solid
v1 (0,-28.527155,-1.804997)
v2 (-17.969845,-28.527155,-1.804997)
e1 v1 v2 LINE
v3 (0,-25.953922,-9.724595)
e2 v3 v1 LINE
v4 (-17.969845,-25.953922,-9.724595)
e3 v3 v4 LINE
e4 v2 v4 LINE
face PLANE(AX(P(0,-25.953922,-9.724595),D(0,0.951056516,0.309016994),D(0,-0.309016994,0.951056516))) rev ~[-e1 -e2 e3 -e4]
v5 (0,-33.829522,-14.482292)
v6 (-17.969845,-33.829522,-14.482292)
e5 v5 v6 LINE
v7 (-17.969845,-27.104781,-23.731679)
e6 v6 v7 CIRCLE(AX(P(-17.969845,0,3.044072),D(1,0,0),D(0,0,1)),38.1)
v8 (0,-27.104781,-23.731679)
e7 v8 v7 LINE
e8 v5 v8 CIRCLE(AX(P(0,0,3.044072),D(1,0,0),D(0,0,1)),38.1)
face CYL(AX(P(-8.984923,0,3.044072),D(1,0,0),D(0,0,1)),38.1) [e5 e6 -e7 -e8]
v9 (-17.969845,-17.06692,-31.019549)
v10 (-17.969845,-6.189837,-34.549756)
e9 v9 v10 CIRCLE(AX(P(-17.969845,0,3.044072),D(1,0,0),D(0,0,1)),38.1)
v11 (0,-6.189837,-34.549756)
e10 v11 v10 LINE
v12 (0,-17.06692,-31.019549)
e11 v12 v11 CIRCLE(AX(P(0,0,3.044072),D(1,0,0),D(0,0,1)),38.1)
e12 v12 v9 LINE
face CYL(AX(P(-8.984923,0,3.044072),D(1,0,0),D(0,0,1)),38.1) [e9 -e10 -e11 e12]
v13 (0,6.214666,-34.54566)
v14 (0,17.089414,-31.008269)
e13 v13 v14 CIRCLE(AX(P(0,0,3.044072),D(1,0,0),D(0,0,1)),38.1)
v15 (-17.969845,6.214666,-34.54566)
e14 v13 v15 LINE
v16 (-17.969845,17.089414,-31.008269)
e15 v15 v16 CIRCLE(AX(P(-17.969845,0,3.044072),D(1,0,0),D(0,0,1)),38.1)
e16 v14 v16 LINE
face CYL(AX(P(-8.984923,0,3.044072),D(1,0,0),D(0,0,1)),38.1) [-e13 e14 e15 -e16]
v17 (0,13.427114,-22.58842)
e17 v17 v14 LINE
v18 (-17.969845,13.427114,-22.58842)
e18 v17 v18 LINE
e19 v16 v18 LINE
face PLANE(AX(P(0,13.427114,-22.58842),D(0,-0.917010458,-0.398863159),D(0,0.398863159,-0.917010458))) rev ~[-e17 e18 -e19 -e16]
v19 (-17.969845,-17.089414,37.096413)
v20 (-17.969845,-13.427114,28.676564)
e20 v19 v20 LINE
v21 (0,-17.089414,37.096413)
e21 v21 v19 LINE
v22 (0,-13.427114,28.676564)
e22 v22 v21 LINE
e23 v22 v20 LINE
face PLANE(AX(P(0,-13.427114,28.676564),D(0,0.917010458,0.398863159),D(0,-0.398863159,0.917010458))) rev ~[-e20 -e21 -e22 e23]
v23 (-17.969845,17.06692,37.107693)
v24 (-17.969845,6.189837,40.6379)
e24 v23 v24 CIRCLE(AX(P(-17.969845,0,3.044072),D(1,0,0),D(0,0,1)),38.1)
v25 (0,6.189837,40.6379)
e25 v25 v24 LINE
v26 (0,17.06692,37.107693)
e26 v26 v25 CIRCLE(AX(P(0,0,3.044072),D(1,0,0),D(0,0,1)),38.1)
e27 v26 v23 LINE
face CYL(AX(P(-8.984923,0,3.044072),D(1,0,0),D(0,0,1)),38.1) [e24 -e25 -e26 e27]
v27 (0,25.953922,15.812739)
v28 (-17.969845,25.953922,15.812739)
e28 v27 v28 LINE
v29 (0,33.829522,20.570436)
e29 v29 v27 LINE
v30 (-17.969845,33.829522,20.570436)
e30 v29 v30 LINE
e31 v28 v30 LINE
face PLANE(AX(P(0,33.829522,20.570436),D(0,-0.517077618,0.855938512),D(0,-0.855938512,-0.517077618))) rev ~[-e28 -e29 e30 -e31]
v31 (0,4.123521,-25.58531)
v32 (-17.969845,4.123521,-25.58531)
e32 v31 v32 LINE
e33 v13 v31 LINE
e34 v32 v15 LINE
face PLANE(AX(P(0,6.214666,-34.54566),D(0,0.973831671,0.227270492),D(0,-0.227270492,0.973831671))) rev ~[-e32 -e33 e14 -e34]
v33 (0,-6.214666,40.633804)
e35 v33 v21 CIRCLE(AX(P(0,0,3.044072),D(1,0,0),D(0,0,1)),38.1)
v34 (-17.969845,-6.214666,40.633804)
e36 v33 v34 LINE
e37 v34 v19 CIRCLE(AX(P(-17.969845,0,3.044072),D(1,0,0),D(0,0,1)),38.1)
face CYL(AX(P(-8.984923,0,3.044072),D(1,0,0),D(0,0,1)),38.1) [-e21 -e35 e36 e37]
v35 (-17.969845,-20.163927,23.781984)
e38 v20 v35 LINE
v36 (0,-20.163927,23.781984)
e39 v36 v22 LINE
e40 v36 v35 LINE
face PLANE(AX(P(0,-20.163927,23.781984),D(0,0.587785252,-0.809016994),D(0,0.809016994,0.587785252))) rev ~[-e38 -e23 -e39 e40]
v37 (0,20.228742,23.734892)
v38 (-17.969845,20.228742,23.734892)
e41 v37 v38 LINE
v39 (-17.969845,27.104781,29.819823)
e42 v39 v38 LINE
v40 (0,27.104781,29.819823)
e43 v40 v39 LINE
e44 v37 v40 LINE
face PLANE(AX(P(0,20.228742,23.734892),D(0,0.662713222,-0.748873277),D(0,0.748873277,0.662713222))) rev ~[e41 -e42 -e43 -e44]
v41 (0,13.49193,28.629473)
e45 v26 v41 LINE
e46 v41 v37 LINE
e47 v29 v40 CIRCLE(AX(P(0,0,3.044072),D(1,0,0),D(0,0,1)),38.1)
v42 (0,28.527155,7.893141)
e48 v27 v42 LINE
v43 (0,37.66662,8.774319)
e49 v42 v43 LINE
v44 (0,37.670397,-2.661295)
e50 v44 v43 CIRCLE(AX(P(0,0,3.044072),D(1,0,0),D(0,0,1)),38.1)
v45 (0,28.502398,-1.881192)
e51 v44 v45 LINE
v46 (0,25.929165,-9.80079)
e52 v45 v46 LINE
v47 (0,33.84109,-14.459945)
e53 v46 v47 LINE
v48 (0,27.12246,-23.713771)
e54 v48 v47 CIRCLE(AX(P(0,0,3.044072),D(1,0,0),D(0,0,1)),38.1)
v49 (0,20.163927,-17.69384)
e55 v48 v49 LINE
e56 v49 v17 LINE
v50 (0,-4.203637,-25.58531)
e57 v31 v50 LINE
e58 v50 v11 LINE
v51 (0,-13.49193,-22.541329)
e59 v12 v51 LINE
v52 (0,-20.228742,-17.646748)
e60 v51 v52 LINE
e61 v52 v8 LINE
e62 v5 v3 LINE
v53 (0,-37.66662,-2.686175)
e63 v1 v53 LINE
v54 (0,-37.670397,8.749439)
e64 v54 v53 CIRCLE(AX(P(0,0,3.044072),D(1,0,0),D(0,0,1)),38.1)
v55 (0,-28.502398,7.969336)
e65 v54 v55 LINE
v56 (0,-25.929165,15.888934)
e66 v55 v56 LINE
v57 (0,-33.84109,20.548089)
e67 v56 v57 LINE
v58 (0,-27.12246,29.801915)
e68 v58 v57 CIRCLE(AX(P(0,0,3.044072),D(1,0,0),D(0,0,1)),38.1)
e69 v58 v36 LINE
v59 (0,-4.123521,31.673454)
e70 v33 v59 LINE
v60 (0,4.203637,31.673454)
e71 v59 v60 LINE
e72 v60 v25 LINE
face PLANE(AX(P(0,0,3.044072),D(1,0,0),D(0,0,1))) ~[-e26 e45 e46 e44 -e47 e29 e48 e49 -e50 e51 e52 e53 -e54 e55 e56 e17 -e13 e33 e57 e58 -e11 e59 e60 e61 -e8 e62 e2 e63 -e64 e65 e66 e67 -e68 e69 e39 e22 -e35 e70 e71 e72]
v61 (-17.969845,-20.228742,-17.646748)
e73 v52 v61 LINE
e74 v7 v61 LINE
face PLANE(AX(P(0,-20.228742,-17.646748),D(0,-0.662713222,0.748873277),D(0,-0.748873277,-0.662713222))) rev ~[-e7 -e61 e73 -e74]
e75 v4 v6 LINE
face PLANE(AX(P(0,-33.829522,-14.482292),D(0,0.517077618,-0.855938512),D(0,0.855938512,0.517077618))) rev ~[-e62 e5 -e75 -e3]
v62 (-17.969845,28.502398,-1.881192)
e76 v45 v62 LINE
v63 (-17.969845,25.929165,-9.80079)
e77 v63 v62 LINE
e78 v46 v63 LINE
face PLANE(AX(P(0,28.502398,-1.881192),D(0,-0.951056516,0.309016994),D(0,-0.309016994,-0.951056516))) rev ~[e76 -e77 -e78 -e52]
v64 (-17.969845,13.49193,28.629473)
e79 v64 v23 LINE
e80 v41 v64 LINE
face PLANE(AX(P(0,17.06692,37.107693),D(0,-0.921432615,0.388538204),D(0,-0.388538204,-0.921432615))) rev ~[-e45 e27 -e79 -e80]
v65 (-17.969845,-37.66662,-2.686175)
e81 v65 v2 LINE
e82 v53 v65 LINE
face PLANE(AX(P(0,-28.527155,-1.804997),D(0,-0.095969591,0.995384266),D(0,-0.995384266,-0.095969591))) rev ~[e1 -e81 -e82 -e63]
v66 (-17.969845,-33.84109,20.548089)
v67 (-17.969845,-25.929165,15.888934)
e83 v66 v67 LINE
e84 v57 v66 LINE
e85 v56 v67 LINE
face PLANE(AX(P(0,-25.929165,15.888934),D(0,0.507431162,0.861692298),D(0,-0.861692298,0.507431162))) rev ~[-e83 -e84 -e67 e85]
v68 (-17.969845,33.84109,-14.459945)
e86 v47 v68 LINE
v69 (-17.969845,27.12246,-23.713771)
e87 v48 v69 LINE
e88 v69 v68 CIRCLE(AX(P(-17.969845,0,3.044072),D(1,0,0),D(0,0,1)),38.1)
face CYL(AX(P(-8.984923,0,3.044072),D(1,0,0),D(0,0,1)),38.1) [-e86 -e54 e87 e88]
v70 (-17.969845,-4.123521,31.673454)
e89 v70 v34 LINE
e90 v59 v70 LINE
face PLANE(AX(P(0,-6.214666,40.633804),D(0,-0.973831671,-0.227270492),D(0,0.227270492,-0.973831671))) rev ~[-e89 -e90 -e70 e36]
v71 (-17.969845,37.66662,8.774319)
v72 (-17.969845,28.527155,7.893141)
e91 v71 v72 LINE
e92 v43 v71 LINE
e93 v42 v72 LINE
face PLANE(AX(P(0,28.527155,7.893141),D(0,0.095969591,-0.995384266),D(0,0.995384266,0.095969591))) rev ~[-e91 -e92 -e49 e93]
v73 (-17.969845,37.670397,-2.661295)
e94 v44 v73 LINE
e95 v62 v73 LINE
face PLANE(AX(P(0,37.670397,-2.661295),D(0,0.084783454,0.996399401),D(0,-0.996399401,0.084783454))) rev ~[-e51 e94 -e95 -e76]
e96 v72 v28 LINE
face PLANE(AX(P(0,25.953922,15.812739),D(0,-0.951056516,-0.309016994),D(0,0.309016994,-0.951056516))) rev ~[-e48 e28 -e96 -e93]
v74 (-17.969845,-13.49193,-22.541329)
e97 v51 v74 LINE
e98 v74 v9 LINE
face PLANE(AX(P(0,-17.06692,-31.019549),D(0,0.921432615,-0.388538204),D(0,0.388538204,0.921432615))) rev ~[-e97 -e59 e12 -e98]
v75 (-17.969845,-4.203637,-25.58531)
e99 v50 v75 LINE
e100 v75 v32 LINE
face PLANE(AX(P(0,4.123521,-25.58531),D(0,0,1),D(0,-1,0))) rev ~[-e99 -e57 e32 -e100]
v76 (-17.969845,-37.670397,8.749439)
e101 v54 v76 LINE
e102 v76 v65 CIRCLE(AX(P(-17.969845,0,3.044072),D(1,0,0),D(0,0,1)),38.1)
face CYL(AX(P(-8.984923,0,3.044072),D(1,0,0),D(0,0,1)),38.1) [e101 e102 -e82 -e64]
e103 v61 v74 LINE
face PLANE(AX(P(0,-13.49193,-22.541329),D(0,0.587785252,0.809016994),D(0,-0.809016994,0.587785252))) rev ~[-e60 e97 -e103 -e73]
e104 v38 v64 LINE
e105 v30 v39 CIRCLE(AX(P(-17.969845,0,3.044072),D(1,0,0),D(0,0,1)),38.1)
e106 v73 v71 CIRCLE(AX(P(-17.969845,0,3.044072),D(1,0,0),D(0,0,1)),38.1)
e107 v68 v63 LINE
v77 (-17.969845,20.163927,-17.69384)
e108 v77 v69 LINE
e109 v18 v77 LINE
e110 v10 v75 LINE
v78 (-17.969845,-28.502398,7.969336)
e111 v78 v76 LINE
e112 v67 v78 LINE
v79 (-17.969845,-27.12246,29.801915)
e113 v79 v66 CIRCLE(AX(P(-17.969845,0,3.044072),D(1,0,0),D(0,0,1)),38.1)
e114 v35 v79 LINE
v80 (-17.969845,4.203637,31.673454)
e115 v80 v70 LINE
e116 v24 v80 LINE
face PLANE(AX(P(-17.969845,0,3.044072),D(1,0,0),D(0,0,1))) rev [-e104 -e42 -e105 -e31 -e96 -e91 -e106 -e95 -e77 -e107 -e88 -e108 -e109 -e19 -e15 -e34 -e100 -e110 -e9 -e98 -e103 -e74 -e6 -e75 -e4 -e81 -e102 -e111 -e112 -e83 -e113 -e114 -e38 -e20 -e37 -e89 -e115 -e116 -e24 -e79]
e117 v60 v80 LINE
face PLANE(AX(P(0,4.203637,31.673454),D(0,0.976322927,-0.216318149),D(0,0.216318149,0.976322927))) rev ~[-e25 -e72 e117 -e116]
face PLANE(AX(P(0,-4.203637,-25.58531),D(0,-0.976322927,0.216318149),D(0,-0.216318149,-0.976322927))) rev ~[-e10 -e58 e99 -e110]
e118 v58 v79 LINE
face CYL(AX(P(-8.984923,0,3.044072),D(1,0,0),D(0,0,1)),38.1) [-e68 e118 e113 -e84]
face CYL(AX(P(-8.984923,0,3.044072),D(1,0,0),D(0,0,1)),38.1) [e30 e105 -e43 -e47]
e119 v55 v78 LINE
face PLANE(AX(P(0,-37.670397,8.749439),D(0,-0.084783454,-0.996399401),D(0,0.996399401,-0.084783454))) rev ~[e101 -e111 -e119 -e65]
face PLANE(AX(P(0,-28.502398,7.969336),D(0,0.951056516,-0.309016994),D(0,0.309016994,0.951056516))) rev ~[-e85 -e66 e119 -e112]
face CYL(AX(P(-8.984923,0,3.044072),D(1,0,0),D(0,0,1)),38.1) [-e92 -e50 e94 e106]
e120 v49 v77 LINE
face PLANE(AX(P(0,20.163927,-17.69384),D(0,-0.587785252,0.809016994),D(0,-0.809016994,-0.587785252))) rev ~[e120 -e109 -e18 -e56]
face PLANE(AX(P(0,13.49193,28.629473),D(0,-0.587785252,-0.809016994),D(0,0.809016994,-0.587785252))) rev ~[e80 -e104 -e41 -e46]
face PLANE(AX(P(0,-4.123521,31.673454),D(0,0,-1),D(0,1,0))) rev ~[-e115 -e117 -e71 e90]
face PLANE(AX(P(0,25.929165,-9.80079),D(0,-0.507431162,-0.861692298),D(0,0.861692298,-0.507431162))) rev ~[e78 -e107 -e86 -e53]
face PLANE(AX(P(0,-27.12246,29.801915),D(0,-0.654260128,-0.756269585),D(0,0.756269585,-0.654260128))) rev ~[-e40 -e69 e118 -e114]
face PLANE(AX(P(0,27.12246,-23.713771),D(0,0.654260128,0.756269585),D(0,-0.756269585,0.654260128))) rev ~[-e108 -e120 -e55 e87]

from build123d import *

# Parameters (mm, degrees)
F0_W            = 17.96984524
F0_H            = 38.1
F3_DEPTH        = 25.4
F3_COPIES_COUNT = 10


# Not quite as in the source:
# - a pattern or mirror of a feature is missing from the dataset's text; its kind, count and spacing are read off the source's solid


with BuildPart() as f1:
    # F0 (on Front) → F1 (revolve)
    with BuildSketch(Plane.XZ):
        with Locations((-8.98492262, 22.0940720202)):
            Rectangle(F0_W, F0_H)
    revolve(axis=Axis((-8.98492262, 0, 3.0440720202), (1, 0, 0)))

    # F2 (on face) → F3 (cut)
    with BuildSketch(Plane.YZ):
        with BuildLine():
            Line((-6.214665944, 40.6338036926), (-4.1235210374, 31.6734537482))
            Line((-4.1235210374, 31.6734537482), (0, 31.6734537482))
            Line((0, 31.6734537482), (0, 41.1440720202))
            ThreePointArc((0, 41.1440720202), (-3.117789544, 41.0162906591), (-6.214665944, 40.6338036926))
        make_face()
        with BuildLine():
            Line((0, 41.1440720202), (0, 31.6734537482))
            Line((0, 31.6734537482), (4.2036371306, 31.6734537482))
            Line((4.2036371306, 31.6734537482), (6.1898369976, 40.6379002098))
            ThreePointArc((6.1898369976, 40.6379002098), (3.1052492637, 41.0173182208), (0, 41.1440720202))
        make_face()
    f3 = extrude(amount=-F3_DEPTH, mode=Mode.SUBTRACT)

    # F3_copies: F3 ×10 about axis
    f3_copies_axis = Axis((0, 0, 3.044072), (1, 0, 0))
    for i in range(1, F3_COPIES_COUNT):
        add(f3.rotate(f3_copies_axis, i * 360 / F3_COPIES_COUNT), mode=Mode.SUBTRACT)


solid = f1.part
